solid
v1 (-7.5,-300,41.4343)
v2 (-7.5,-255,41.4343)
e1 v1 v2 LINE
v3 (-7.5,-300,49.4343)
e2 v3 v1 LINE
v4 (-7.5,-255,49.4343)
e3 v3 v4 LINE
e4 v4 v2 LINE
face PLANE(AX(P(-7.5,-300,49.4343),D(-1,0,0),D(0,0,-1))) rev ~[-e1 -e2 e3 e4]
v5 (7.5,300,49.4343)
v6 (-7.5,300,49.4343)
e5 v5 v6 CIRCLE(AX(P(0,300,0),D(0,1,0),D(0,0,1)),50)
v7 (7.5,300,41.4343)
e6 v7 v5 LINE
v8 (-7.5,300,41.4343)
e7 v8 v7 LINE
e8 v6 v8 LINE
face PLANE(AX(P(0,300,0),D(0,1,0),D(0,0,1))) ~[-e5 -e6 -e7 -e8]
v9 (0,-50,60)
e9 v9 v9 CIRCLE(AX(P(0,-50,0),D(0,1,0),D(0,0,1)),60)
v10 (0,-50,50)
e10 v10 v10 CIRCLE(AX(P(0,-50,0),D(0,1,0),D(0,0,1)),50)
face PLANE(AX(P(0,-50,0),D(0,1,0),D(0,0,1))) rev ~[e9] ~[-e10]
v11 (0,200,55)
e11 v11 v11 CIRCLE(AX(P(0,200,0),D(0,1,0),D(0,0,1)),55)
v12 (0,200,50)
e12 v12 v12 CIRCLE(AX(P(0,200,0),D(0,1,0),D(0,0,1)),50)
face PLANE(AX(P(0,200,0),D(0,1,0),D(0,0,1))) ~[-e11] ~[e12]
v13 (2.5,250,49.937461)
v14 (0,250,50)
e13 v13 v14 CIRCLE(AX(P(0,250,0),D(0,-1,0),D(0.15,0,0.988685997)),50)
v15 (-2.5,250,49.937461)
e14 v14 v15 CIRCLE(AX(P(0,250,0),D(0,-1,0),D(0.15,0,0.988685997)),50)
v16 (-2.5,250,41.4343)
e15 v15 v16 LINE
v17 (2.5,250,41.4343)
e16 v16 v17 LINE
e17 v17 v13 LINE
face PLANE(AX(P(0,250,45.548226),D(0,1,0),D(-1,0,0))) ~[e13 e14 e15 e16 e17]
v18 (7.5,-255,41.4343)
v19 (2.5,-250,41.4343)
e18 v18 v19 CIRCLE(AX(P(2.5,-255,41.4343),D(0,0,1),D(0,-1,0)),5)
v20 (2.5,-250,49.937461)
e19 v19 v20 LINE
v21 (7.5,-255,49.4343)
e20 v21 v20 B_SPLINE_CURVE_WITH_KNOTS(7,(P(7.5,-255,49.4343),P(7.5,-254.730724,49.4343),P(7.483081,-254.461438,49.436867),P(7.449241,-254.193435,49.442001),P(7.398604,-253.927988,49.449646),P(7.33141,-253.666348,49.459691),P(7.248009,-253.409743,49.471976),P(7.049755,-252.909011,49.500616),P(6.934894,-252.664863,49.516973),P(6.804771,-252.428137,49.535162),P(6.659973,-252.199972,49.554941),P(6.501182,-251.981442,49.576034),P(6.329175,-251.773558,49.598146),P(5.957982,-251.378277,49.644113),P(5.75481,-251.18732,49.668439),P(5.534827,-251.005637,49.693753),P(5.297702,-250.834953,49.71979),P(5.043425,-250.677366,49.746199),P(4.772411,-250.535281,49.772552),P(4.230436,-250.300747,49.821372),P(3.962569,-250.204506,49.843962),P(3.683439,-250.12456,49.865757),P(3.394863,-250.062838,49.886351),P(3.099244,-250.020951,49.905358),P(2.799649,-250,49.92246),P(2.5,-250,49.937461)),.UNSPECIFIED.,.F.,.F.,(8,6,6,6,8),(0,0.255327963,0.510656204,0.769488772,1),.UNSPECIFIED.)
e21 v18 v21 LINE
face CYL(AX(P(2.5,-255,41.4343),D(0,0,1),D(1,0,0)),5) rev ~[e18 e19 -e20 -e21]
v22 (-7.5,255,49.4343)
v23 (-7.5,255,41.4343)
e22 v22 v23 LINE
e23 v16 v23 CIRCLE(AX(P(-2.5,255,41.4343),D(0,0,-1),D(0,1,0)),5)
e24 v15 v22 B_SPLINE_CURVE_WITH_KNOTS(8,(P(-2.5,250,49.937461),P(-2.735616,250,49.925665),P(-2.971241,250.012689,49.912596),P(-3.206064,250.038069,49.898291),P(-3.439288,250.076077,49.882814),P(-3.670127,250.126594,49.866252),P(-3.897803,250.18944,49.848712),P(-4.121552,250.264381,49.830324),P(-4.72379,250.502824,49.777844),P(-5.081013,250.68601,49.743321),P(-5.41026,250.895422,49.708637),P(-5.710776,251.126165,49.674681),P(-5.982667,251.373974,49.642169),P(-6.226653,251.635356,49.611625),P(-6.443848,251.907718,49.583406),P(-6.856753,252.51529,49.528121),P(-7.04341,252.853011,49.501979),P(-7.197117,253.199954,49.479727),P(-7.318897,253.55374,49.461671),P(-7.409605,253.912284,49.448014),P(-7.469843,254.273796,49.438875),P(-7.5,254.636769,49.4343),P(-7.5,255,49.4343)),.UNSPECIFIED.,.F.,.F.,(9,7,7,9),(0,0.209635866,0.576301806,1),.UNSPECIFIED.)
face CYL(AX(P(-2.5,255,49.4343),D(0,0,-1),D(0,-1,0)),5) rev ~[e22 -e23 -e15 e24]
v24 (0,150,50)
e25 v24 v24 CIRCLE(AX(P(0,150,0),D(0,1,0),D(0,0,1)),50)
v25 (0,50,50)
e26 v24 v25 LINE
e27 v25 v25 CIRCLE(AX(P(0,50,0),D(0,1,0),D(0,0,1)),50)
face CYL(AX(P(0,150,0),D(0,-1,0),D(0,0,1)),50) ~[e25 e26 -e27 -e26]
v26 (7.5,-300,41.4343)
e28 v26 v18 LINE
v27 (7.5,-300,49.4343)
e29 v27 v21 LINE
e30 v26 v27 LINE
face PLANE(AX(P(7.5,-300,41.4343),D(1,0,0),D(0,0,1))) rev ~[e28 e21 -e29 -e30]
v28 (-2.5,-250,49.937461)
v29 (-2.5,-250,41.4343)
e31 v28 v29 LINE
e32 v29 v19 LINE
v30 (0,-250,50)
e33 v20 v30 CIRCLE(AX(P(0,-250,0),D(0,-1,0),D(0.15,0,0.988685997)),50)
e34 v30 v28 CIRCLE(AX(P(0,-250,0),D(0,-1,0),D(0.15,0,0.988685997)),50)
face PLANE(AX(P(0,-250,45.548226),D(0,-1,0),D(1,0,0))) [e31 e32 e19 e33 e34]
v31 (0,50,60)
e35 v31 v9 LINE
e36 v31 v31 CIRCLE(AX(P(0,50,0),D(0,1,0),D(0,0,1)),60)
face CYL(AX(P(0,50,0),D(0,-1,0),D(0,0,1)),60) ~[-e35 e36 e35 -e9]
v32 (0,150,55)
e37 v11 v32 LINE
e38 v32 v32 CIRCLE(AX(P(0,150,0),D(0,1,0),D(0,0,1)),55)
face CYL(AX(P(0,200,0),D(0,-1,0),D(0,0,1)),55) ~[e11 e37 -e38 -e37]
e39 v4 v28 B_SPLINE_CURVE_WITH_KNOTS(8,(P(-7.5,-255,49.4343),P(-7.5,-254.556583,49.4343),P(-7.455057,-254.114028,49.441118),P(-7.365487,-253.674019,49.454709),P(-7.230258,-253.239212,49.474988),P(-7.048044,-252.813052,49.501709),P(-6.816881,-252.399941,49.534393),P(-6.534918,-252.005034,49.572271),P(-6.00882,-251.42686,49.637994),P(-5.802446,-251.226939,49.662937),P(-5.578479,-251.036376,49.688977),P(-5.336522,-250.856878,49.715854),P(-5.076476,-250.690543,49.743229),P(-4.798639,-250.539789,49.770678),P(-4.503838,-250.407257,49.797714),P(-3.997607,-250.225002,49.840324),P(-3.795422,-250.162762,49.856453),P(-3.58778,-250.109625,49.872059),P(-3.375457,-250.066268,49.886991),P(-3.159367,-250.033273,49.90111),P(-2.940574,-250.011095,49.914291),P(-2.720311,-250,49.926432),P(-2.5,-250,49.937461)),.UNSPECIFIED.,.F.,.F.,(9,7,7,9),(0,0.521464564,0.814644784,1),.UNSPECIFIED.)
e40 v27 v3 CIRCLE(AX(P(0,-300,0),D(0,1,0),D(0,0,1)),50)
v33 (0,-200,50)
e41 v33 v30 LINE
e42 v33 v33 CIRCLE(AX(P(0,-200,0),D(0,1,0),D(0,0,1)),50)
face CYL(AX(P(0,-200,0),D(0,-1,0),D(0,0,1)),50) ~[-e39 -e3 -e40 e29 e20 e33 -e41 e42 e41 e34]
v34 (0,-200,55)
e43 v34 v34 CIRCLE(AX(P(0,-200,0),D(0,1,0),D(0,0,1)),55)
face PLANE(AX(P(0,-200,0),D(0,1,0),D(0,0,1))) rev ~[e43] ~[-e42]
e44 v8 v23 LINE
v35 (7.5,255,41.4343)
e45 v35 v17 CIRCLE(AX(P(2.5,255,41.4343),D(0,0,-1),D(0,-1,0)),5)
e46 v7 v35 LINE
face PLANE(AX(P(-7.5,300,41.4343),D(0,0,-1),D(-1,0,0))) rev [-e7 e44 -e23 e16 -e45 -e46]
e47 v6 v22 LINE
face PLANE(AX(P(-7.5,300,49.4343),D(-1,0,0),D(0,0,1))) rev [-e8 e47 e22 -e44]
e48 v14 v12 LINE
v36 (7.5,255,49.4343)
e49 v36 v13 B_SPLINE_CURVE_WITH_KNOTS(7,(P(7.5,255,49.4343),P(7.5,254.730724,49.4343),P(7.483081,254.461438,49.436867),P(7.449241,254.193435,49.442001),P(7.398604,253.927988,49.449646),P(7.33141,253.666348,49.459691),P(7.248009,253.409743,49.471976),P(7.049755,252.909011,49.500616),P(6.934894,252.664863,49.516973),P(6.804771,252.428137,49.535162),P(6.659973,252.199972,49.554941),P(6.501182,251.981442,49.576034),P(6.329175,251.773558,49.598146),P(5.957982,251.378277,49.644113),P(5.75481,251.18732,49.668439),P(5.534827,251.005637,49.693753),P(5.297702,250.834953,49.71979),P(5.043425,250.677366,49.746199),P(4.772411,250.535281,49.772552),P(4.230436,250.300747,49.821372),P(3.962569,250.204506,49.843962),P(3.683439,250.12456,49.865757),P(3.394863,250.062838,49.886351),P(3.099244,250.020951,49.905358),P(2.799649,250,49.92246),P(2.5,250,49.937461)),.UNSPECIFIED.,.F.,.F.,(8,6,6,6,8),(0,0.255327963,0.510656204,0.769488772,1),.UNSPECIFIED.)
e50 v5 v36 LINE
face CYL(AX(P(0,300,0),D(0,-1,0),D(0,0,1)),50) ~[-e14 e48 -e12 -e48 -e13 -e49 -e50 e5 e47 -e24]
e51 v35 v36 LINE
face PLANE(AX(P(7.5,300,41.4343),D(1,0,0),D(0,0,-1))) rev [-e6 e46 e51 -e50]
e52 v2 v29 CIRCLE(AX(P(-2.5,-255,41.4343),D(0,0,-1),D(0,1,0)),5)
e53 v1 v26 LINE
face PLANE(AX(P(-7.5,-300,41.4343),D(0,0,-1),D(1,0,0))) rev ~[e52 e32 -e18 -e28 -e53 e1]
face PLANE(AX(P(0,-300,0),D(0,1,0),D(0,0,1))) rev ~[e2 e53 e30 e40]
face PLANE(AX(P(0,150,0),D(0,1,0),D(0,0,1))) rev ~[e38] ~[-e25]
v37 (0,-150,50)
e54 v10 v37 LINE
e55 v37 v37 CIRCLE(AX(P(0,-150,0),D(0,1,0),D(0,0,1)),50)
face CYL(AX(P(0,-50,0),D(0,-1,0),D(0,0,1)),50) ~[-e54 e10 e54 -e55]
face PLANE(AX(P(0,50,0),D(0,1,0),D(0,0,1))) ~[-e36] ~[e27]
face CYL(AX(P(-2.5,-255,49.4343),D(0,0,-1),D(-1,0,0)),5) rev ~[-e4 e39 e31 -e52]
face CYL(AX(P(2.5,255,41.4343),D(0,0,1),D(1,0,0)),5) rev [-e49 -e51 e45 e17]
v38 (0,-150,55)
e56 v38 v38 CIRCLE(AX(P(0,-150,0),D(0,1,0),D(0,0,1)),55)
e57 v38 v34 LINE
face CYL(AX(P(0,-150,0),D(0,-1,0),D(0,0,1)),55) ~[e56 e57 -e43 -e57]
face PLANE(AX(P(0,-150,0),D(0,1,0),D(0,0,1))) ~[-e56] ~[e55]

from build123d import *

# Parameters (mm, degrees)
F3_DEPTH = 50
F4_R     = 5


# Not quite as in the source:
# - a pattern or mirror of a feature is missing from the dataset's text; its kind, count and spacing are read off the source's solid


with BuildPart() as f1:
    # F0 (on Right) → F1 (revolve)
    with BuildSketch(Plane.YZ):
        Polygon((-300, 50), (-300, 0), (300, 0), (300, 50), (200, 50), (200, 55), (150, 55), (150, 50), (50, 50), (50, 60), (-50, 60), (-50, 50), (-150, 50), (-150, 55), (-200, 55), (-200, 50), align=None)
    revolve(axis=Axis((0, 0, 0), (0, 1, 0)))

    # F2 (on face) → F3 (cut)
    with BuildSketch(Plane.XZ.offset(300)):
        with BuildLine():
            Line((-7.5, 41.4342998332), (7.5, 41.4342998332))
            Line((7.5, 41.4342998332), (7.5, 49.4342998332))
            ThreePointArc((7.5, 49.4342998332), (0, 50), (-7.5, 49.4342998332))
            Line((-7.5, 49.4342998332), (-7.5, 41.4342998332))
        make_face()
    f3 = extrude(amount=-F3_DEPTH, mode=Mode.SUBTRACT)

    # F3_copies: F3 across plane
    add(f3.mirror(Plane.ZX), mode=Mode.SUBTRACT)

    # F4
    f4_edges = [f1.edges().sort_by_distance(p)[0] for p in [
        (-7.5, -250, 45.4343),
        (7.5, -250, 45.4343),
        (7.5, 250, 45.4343),
        (-7.5, 250, 45.4343),
    ]]
    fillet(f4_edges, radius=F4_R)


solid = f1.part
